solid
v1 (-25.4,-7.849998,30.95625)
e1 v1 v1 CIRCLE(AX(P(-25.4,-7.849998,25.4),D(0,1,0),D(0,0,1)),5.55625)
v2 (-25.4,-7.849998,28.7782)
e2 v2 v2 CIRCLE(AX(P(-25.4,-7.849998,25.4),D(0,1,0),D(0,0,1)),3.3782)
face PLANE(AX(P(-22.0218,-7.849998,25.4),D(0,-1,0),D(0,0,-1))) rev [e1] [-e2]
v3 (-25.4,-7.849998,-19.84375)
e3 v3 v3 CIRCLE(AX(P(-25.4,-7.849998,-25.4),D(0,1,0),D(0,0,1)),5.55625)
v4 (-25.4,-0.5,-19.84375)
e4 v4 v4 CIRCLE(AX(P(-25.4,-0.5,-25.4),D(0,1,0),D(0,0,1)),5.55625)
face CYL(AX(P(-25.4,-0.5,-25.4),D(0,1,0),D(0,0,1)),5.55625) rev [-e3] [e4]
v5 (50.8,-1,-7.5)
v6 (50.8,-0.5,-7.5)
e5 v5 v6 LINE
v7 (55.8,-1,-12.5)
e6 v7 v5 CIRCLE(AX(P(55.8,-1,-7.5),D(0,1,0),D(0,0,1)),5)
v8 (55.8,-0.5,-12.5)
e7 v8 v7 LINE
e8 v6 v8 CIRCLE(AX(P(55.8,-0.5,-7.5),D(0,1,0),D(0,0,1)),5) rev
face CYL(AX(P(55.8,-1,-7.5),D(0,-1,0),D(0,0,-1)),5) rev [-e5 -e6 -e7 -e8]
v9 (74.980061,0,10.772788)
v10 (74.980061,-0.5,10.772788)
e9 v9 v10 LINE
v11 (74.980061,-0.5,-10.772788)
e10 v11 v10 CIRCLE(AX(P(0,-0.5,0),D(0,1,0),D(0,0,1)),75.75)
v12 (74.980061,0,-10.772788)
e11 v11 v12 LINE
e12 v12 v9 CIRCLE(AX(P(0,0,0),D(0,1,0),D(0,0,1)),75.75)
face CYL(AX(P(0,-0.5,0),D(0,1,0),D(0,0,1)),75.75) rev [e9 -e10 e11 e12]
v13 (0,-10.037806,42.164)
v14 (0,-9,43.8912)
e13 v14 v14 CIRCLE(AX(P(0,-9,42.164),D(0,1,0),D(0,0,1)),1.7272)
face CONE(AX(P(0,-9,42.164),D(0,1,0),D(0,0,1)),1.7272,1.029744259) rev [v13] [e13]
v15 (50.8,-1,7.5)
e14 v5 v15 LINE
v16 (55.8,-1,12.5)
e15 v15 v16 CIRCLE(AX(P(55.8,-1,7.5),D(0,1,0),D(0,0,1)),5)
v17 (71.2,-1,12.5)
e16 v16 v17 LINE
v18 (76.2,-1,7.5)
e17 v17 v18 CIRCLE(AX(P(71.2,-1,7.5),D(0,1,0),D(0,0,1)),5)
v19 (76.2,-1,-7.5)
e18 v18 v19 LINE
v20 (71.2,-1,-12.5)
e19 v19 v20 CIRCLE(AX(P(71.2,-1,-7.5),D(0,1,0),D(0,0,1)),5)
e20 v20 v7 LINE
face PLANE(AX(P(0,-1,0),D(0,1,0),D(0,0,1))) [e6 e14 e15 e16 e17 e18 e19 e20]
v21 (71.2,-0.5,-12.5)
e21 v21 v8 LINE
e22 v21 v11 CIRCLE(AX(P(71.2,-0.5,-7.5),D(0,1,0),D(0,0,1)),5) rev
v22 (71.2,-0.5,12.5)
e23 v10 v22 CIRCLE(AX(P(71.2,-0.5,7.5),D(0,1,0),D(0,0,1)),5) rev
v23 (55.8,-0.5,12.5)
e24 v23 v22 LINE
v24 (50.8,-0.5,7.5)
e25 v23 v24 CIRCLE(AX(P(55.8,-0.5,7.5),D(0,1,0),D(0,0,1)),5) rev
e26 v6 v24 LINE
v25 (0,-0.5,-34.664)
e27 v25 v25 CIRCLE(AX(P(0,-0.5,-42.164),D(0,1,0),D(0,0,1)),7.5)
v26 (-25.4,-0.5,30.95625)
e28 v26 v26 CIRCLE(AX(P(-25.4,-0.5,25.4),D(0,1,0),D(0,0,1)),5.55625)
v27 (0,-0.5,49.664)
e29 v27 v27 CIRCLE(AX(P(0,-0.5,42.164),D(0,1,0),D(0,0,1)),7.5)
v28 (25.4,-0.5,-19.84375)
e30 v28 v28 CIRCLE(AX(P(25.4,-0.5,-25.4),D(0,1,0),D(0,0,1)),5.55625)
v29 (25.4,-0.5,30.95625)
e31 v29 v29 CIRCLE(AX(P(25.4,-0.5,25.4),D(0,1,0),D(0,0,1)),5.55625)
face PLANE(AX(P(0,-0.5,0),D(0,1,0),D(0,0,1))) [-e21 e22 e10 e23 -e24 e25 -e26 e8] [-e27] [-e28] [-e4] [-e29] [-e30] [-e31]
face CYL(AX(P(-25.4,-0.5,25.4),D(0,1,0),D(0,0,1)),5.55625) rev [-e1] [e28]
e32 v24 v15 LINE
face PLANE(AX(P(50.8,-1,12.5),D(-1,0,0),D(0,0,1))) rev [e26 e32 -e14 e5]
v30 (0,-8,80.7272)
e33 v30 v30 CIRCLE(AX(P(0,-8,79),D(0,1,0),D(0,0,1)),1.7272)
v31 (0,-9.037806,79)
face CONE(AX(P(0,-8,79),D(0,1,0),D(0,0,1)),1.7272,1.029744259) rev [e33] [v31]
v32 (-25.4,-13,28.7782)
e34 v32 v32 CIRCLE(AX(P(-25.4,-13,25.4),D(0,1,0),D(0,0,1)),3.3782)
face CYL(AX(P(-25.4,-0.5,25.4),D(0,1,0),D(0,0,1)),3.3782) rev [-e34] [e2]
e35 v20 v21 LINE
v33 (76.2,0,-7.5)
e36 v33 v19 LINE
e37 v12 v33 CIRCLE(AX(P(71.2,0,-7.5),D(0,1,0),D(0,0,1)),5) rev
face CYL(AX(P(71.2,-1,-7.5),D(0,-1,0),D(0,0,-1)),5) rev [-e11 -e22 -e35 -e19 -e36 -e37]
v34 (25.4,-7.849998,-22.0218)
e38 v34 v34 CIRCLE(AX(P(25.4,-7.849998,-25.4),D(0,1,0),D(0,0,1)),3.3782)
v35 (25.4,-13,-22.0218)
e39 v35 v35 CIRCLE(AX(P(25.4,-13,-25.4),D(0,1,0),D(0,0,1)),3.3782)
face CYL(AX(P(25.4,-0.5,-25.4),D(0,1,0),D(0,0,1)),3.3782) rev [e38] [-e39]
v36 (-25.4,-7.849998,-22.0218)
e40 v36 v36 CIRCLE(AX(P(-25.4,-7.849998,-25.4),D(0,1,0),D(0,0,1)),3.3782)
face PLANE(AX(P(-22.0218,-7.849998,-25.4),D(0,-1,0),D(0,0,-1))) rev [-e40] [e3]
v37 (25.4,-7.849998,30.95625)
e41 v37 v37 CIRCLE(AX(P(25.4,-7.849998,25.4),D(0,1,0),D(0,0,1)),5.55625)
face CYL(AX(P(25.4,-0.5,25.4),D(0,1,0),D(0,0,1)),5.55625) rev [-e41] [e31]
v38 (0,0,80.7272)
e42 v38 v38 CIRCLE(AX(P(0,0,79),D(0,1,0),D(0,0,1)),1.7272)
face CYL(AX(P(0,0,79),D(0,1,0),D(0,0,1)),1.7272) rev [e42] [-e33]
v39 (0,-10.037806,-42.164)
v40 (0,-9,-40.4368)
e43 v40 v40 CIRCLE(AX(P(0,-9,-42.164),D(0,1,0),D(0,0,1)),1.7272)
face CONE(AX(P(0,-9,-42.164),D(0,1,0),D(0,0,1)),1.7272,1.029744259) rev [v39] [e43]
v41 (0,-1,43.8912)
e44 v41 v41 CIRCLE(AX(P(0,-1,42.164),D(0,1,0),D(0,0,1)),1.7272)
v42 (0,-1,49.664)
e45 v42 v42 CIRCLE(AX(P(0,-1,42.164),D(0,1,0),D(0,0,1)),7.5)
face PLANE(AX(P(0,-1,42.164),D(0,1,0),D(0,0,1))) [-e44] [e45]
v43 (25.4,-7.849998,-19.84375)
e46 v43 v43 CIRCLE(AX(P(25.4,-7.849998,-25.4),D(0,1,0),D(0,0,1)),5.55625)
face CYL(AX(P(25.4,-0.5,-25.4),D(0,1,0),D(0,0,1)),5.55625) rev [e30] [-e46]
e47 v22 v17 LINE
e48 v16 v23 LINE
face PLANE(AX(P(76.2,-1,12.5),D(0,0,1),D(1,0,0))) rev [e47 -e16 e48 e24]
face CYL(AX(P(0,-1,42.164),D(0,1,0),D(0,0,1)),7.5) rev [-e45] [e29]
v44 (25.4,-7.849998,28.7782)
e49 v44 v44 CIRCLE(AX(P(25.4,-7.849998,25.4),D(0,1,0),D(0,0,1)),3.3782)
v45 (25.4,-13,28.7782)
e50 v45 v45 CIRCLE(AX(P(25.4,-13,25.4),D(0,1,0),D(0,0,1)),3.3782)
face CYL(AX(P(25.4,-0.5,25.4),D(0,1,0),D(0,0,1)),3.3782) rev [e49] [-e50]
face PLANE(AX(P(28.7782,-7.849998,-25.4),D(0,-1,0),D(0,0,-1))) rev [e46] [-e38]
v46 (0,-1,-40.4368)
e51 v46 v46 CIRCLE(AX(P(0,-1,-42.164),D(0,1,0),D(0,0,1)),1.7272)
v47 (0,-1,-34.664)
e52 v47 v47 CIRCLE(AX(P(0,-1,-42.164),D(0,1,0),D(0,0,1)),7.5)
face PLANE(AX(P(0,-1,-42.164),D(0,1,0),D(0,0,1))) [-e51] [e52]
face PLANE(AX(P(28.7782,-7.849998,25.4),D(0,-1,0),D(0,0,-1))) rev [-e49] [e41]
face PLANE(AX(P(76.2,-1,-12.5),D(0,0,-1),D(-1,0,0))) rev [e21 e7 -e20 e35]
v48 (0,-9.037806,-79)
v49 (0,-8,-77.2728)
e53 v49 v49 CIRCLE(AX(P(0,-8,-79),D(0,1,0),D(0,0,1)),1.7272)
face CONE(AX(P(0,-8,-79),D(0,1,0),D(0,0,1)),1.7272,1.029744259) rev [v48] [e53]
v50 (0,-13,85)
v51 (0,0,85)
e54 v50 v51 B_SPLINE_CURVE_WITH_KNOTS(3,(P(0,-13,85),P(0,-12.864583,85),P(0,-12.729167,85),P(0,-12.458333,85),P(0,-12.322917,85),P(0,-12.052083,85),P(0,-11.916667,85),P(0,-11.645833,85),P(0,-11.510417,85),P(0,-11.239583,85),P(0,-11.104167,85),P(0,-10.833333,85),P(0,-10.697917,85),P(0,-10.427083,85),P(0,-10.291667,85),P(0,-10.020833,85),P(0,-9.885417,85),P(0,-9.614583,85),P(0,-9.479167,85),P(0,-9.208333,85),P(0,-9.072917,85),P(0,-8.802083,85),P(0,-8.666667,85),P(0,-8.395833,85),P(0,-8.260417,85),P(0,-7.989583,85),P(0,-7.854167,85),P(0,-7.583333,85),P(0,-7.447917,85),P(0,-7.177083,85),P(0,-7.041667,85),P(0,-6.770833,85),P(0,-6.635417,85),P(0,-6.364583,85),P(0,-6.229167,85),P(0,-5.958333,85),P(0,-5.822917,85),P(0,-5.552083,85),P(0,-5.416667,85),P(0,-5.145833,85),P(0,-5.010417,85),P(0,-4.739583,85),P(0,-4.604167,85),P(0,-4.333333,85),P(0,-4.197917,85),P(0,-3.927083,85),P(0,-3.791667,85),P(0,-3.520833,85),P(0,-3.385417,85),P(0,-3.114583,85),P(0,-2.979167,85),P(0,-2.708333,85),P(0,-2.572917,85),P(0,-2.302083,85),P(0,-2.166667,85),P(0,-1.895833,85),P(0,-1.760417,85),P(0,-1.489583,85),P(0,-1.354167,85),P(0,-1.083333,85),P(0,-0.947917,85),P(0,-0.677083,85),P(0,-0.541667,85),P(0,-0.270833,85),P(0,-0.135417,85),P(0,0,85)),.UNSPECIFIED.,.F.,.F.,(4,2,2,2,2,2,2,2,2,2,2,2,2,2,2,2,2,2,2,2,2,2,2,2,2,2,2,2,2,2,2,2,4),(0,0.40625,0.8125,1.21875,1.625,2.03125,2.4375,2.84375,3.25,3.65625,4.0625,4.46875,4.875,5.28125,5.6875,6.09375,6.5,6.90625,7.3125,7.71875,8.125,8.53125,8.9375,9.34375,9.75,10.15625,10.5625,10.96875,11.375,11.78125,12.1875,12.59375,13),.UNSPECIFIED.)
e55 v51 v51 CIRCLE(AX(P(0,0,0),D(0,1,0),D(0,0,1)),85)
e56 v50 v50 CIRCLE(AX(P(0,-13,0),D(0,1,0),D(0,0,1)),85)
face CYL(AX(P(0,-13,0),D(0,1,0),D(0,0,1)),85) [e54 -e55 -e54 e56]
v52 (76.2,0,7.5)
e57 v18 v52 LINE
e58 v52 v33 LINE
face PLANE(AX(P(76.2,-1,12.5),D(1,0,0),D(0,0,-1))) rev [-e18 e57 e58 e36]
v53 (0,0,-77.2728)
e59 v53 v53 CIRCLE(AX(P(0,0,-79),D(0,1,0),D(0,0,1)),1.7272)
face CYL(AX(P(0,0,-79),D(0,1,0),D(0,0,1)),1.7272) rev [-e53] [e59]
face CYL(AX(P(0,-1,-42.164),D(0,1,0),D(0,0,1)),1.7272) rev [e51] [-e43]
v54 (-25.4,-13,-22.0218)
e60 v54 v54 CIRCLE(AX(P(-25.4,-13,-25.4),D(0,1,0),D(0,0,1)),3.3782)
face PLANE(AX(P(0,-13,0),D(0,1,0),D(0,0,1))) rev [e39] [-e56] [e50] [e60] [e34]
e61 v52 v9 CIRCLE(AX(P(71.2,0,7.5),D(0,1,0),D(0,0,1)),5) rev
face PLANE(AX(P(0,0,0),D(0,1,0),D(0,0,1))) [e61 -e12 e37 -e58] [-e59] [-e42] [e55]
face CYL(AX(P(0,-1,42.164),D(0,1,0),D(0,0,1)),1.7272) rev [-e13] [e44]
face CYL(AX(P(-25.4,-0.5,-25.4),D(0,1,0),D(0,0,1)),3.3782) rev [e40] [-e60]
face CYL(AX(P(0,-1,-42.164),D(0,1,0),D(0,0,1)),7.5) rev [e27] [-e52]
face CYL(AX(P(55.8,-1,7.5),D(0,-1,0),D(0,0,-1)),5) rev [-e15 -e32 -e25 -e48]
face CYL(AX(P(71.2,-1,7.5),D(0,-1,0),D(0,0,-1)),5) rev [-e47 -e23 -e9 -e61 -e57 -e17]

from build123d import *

# Parameters (mm, degrees)
SKETCH1_R                                        = 85
BOSS_EXTRUDE1_DEPTH                              = 13
SKETCH2_R                                        = 75.75
CUT_EXTRUDE1_DEPTH                               = 0.5
CBORE_FOR_1_4_SOCKET_HEAD_CAP_SCREW1_D           = 6.7564
CBORE_FOR_1_4_SOCKET_HEAD_CAP_SCREW1_DEPTH       = 15
CBORE_FOR_1_4_SOCKET_HEAD_CAP_SCREW1_CBORE_D     = 11.1125
CBORE_FOR_1_4_SOCKET_HEAD_CAP_SCREW1_CBORE_DEPTH = 7.349998
CBORE_FOR_1_4_SOCKET_HEAD_CAP_SCREW1_TIP         = 2.029827343
F_8_32_TAPPED_HOLE1_D                            = 3.4544
F_8_32_TAPPED_HOLE1_DEPTH                        = 8
F_8_32_TAPPED_HOLE1_TIP                          = 1.037806461
SKETCH9_W                                        = 25.4
SKETCH9_H                                        = 25
WAFER_TWEEZER_SLOT_DEPTH                         = 1
FILLET1_R                                        = 5
SKETCH10_R                                       = 7.5
CUT_EXTRUDE2_DEPTH                               = 0.5
F_8_32_TAPPED_HOLE2_D                            = 3.4544
F_8_32_TAPPED_HOLE2_DEPTH                        = 8
F_8_32_TAPPED_HOLE2_TIP                          = 1.037806461


with BuildPart() as part:
    # Sketch1 → Boss-Extrude1 (new body)
    with BuildSketch(Plane(origin=(0, 0, 0), x_dir=(1, 0, 0), z_dir=(0, 1, 0))):
        with Locations(Location((0, 0, 0), (0, 0, 270))):
            Circle(SKETCH1_R)
    extrude(amount=-BOSS_EXTRUDE1_DEPTH)

    # Sketch2 → Cut-Extrude1 (cut)
    with BuildSketch(Plane(origin=(0, 0, 0), x_dir=(1, 0, 0), z_dir=(0, 1, 0))):
        with Locations(Location((0, 0, 0), (0, 0, 270))):
            Circle(SKETCH2_R)
    extrude(amount=-CUT_EXTRUDE1_DEPTH, mode=Mode.SUBTRACT)

    # CBORE for 1/4 Socket Head Cap Screw1
    with Locations(Plane(origin=(0, -0.5, 0), x_dir=(-1, 0, 0), z_dir=(0, 1, 0))):
        with Locations((25.4, 25.4), (-25.4, 25.4), (-25.4, -25.4), (25.4, -25.4)):
            CounterBoreHole(CBORE_FOR_1_4_SOCKET_HEAD_CAP_SCREW1_D / 2, CBORE_FOR_1_4_SOCKET_HEAD_CAP_SCREW1_CBORE_D / 2, CBORE_FOR_1_4_SOCKET_HEAD_CAP_SCREW1_CBORE_DEPTH, depth=CBORE_FOR_1_4_SOCKET_HEAD_CAP_SCREW1_DEPTH)
            with Locations((0, 0, -(CBORE_FOR_1_4_SOCKET_HEAD_CAP_SCREW1_DEPTH + CBORE_FOR_1_4_SOCKET_HEAD_CAP_SCREW1_TIP / 2))):  # 118° drill point
                Cone(0, CBORE_FOR_1_4_SOCKET_HEAD_CAP_SCREW1_D / 2, CBORE_FOR_1_4_SOCKET_HEAD_CAP_SCREW1_TIP, mode=Mode.SUBTRACT)

    # #8-32 Tapped Hole1
    with Locations(Plane(origin=(0, 0, 0), x_dir=(1, 0, 0), z_dir=(0, 1, 0))):
        with Locations((0, 79), (0, -79)):
            Hole(F_8_32_TAPPED_HOLE1_D / 2, depth=F_8_32_TAPPED_HOLE1_DEPTH)
            with Locations((0, 0, -(F_8_32_TAPPED_HOLE1_DEPTH + F_8_32_TAPPED_HOLE1_TIP / 2))):  # 118° drill point
                Cone(0, F_8_32_TAPPED_HOLE1_D / 2, F_8_32_TAPPED_HOLE1_TIP, mode=Mode.SUBTRACT)

    # Sketch9 → wafer_tweezer_slot (cut)
    with BuildSketch(Plane(origin=(0, 0, 0), x_dir=(1, 0, 0), z_dir=(0, 1, 0))):
        with Locations((63.5, 0)):
            Rectangle(SKETCH9_W, SKETCH9_H)
    extrude(amount=-WAFER_TWEEZER_SLOT_DEPTH, mode=Mode.SUBTRACT)

    # Fillet1
    # the kernel refuses this fillet: 5 mm, written as the material it adds along each edge
    with BuildSketch(Plane(origin=(76.2, 0, -12.5), x_dir=(0, 0, 1), z_dir=(0, -1, 0))) as fillet1_piece_1_section:
        with BuildLine():
            CenterArc((FILLET1_R, FILLET1_R), FILLET1_R, 180, 90)
            Line((0, FILLET1_R), (0, 0))
            Line((0, 0), (FILLET1_R, 0))
        make_face()
    fillet1_piece_1 = extrude(amount=1, mode=Mode.PRIVATE)
    fillet1_piece_1 = fillet1_piece_1 - Plane(origin=(0, -0.25, 0), x_dir=(0, 0, 1), z_dir=(0, 1, 0)) * Cylinder(75.75, 23, mode=Mode.PRIVATE)
    add(fillet1_piece_1)
    with BuildSketch(Plane(origin=(76.2, 12.5, -12.5), x_dir=(0, 0, 1), z_dir=(0, -1, 0))) as fillet1_piece_2_section:
        with BuildLine():
            CenterArc((FILLET1_R, FILLET1_R), FILLET1_R, 180, 90)
            Line((0, FILLET1_R), (0, 0))
            Line((0, 0), (FILLET1_R, 0))
        make_face()
    fillet1_piece_2 = extrude(amount=13.5, mode=Mode.PRIVATE)
    fillet1_piece_2 = split(fillet1_piece_2, bisect_by=Plane(origin=(73.966184718, -0.5, -12.010793602), z_dir=(0, -1, 0)), keep=Keep.TOP, mode=Mode.PRIVATE)
    add(fillet1_piece_2)
    with BuildSketch(Plane(origin=(76.2, 0, 12.5), x_dir=(0, 0, -1), z_dir=(0, -1, 0))) as fillet1_piece_3_section:
        with BuildLine():
            CenterArc((FILLET1_R, -FILLET1_R), FILLET1_R, 90, 90)
            Line((0, -FILLET1_R), (0, 0))
            Line((0, 0), (FILLET1_R, 0))
        make_face()
    fillet1_piece_3 = extrude(amount=1, mode=Mode.PRIVATE)
    fillet1_piece_3 = fillet1_piece_3 - Plane(origin=(0, -0.25, 0), x_dir=(0, 0, 1), z_dir=(0, 1, 0)) * Cylinder(75.75, 22, mode=Mode.PRIVATE)
    add(fillet1_piece_3)
    with BuildSketch(Plane(origin=(76.2, 12.5, 12.5), x_dir=(0, 0, -1), z_dir=(0, -1, 0))) as fillet1_piece_4_section:
        with BuildLine():
            CenterArc((FILLET1_R, -FILLET1_R), FILLET1_R, 90, 90)
            Line((0, -FILLET1_R), (0, 0))
            Line((0, 0), (FILLET1_R, 0))
        make_face()
    fillet1_piece_4 = extrude(amount=13.5, mode=Mode.PRIVATE)
    fillet1_piece_4 = split(fillet1_piece_4, bisect_by=Plane(origin=(73.966184718, -0.5, 12.010793602), z_dir=(0, -1, 0)), keep=Keep.TOP, mode=Mode.PRIVATE)
    add(fillet1_piece_4)
    with BuildSketch(Plane(origin=(50.8, -0.5, 12.5), x_dir=(0, 0, -1), z_dir=(0, -1, 0))) as fillet1_piece_5:
        with BuildLine():
            CenterArc((FILLET1_R, FILLET1_R), FILLET1_R, 180, 90)
            Line((0, FILLET1_R), (0, 0))
            Line((0, 0), (FILLET1_R, 0))
        make_face()
    extrude(amount=0.5)
    with BuildSketch(Plane(origin=(50.8, -0.5, -12.5), x_dir=(0, 0, 1), z_dir=(0, -1, 0))) as fillet1_piece_6:
        with BuildLine():
            CenterArc((FILLET1_R, -FILLET1_R), FILLET1_R, 90, 90)
            Line((0, -FILLET1_R), (0, 0))
            Line((0, 0), (FILLET1_R, 0))
        make_face()
    extrude(amount=0.5)

    # Sketch10 → Cut-Extrude2 (cut)
    with BuildSketch(Plane(origin=(0, -0.5, 0), x_dir=(1, 0, 0), z_dir=(0, 1, 0))):
        with Locations(Location((0, -42.164, 0), (0, 0, 270))):
            Circle(SKETCH10_R)
        with Locations(Location((0, 42.164, 0), (0, 0, 270))):
            Circle(SKETCH10_R)
    extrude(amount=-CUT_EXTRUDE2_DEPTH, mode=Mode.SUBTRACT)

    # #8-32 Tapped Hole2
    with Locations(Plane(origin=(0, -1, 0), x_dir=(1, 0, 0), z_dir=(0, 1, 0))):
        with Locations((0, 42.164), (0, -42.164)):
            Hole(F_8_32_TAPPED_HOLE2_D / 2, depth=F_8_32_TAPPED_HOLE2_DEPTH)
            with Locations((0, 0, -(F_8_32_TAPPED_HOLE2_DEPTH + F_8_32_TAPPED_HOLE2_TIP / 2))):  # 118° drill point
                Cone(0, F_8_32_TAPPED_HOLE2_D / 2, F_8_32_TAPPED_HOLE2_TIP, mode=Mode.SUBTRACT)


solid = part.part
